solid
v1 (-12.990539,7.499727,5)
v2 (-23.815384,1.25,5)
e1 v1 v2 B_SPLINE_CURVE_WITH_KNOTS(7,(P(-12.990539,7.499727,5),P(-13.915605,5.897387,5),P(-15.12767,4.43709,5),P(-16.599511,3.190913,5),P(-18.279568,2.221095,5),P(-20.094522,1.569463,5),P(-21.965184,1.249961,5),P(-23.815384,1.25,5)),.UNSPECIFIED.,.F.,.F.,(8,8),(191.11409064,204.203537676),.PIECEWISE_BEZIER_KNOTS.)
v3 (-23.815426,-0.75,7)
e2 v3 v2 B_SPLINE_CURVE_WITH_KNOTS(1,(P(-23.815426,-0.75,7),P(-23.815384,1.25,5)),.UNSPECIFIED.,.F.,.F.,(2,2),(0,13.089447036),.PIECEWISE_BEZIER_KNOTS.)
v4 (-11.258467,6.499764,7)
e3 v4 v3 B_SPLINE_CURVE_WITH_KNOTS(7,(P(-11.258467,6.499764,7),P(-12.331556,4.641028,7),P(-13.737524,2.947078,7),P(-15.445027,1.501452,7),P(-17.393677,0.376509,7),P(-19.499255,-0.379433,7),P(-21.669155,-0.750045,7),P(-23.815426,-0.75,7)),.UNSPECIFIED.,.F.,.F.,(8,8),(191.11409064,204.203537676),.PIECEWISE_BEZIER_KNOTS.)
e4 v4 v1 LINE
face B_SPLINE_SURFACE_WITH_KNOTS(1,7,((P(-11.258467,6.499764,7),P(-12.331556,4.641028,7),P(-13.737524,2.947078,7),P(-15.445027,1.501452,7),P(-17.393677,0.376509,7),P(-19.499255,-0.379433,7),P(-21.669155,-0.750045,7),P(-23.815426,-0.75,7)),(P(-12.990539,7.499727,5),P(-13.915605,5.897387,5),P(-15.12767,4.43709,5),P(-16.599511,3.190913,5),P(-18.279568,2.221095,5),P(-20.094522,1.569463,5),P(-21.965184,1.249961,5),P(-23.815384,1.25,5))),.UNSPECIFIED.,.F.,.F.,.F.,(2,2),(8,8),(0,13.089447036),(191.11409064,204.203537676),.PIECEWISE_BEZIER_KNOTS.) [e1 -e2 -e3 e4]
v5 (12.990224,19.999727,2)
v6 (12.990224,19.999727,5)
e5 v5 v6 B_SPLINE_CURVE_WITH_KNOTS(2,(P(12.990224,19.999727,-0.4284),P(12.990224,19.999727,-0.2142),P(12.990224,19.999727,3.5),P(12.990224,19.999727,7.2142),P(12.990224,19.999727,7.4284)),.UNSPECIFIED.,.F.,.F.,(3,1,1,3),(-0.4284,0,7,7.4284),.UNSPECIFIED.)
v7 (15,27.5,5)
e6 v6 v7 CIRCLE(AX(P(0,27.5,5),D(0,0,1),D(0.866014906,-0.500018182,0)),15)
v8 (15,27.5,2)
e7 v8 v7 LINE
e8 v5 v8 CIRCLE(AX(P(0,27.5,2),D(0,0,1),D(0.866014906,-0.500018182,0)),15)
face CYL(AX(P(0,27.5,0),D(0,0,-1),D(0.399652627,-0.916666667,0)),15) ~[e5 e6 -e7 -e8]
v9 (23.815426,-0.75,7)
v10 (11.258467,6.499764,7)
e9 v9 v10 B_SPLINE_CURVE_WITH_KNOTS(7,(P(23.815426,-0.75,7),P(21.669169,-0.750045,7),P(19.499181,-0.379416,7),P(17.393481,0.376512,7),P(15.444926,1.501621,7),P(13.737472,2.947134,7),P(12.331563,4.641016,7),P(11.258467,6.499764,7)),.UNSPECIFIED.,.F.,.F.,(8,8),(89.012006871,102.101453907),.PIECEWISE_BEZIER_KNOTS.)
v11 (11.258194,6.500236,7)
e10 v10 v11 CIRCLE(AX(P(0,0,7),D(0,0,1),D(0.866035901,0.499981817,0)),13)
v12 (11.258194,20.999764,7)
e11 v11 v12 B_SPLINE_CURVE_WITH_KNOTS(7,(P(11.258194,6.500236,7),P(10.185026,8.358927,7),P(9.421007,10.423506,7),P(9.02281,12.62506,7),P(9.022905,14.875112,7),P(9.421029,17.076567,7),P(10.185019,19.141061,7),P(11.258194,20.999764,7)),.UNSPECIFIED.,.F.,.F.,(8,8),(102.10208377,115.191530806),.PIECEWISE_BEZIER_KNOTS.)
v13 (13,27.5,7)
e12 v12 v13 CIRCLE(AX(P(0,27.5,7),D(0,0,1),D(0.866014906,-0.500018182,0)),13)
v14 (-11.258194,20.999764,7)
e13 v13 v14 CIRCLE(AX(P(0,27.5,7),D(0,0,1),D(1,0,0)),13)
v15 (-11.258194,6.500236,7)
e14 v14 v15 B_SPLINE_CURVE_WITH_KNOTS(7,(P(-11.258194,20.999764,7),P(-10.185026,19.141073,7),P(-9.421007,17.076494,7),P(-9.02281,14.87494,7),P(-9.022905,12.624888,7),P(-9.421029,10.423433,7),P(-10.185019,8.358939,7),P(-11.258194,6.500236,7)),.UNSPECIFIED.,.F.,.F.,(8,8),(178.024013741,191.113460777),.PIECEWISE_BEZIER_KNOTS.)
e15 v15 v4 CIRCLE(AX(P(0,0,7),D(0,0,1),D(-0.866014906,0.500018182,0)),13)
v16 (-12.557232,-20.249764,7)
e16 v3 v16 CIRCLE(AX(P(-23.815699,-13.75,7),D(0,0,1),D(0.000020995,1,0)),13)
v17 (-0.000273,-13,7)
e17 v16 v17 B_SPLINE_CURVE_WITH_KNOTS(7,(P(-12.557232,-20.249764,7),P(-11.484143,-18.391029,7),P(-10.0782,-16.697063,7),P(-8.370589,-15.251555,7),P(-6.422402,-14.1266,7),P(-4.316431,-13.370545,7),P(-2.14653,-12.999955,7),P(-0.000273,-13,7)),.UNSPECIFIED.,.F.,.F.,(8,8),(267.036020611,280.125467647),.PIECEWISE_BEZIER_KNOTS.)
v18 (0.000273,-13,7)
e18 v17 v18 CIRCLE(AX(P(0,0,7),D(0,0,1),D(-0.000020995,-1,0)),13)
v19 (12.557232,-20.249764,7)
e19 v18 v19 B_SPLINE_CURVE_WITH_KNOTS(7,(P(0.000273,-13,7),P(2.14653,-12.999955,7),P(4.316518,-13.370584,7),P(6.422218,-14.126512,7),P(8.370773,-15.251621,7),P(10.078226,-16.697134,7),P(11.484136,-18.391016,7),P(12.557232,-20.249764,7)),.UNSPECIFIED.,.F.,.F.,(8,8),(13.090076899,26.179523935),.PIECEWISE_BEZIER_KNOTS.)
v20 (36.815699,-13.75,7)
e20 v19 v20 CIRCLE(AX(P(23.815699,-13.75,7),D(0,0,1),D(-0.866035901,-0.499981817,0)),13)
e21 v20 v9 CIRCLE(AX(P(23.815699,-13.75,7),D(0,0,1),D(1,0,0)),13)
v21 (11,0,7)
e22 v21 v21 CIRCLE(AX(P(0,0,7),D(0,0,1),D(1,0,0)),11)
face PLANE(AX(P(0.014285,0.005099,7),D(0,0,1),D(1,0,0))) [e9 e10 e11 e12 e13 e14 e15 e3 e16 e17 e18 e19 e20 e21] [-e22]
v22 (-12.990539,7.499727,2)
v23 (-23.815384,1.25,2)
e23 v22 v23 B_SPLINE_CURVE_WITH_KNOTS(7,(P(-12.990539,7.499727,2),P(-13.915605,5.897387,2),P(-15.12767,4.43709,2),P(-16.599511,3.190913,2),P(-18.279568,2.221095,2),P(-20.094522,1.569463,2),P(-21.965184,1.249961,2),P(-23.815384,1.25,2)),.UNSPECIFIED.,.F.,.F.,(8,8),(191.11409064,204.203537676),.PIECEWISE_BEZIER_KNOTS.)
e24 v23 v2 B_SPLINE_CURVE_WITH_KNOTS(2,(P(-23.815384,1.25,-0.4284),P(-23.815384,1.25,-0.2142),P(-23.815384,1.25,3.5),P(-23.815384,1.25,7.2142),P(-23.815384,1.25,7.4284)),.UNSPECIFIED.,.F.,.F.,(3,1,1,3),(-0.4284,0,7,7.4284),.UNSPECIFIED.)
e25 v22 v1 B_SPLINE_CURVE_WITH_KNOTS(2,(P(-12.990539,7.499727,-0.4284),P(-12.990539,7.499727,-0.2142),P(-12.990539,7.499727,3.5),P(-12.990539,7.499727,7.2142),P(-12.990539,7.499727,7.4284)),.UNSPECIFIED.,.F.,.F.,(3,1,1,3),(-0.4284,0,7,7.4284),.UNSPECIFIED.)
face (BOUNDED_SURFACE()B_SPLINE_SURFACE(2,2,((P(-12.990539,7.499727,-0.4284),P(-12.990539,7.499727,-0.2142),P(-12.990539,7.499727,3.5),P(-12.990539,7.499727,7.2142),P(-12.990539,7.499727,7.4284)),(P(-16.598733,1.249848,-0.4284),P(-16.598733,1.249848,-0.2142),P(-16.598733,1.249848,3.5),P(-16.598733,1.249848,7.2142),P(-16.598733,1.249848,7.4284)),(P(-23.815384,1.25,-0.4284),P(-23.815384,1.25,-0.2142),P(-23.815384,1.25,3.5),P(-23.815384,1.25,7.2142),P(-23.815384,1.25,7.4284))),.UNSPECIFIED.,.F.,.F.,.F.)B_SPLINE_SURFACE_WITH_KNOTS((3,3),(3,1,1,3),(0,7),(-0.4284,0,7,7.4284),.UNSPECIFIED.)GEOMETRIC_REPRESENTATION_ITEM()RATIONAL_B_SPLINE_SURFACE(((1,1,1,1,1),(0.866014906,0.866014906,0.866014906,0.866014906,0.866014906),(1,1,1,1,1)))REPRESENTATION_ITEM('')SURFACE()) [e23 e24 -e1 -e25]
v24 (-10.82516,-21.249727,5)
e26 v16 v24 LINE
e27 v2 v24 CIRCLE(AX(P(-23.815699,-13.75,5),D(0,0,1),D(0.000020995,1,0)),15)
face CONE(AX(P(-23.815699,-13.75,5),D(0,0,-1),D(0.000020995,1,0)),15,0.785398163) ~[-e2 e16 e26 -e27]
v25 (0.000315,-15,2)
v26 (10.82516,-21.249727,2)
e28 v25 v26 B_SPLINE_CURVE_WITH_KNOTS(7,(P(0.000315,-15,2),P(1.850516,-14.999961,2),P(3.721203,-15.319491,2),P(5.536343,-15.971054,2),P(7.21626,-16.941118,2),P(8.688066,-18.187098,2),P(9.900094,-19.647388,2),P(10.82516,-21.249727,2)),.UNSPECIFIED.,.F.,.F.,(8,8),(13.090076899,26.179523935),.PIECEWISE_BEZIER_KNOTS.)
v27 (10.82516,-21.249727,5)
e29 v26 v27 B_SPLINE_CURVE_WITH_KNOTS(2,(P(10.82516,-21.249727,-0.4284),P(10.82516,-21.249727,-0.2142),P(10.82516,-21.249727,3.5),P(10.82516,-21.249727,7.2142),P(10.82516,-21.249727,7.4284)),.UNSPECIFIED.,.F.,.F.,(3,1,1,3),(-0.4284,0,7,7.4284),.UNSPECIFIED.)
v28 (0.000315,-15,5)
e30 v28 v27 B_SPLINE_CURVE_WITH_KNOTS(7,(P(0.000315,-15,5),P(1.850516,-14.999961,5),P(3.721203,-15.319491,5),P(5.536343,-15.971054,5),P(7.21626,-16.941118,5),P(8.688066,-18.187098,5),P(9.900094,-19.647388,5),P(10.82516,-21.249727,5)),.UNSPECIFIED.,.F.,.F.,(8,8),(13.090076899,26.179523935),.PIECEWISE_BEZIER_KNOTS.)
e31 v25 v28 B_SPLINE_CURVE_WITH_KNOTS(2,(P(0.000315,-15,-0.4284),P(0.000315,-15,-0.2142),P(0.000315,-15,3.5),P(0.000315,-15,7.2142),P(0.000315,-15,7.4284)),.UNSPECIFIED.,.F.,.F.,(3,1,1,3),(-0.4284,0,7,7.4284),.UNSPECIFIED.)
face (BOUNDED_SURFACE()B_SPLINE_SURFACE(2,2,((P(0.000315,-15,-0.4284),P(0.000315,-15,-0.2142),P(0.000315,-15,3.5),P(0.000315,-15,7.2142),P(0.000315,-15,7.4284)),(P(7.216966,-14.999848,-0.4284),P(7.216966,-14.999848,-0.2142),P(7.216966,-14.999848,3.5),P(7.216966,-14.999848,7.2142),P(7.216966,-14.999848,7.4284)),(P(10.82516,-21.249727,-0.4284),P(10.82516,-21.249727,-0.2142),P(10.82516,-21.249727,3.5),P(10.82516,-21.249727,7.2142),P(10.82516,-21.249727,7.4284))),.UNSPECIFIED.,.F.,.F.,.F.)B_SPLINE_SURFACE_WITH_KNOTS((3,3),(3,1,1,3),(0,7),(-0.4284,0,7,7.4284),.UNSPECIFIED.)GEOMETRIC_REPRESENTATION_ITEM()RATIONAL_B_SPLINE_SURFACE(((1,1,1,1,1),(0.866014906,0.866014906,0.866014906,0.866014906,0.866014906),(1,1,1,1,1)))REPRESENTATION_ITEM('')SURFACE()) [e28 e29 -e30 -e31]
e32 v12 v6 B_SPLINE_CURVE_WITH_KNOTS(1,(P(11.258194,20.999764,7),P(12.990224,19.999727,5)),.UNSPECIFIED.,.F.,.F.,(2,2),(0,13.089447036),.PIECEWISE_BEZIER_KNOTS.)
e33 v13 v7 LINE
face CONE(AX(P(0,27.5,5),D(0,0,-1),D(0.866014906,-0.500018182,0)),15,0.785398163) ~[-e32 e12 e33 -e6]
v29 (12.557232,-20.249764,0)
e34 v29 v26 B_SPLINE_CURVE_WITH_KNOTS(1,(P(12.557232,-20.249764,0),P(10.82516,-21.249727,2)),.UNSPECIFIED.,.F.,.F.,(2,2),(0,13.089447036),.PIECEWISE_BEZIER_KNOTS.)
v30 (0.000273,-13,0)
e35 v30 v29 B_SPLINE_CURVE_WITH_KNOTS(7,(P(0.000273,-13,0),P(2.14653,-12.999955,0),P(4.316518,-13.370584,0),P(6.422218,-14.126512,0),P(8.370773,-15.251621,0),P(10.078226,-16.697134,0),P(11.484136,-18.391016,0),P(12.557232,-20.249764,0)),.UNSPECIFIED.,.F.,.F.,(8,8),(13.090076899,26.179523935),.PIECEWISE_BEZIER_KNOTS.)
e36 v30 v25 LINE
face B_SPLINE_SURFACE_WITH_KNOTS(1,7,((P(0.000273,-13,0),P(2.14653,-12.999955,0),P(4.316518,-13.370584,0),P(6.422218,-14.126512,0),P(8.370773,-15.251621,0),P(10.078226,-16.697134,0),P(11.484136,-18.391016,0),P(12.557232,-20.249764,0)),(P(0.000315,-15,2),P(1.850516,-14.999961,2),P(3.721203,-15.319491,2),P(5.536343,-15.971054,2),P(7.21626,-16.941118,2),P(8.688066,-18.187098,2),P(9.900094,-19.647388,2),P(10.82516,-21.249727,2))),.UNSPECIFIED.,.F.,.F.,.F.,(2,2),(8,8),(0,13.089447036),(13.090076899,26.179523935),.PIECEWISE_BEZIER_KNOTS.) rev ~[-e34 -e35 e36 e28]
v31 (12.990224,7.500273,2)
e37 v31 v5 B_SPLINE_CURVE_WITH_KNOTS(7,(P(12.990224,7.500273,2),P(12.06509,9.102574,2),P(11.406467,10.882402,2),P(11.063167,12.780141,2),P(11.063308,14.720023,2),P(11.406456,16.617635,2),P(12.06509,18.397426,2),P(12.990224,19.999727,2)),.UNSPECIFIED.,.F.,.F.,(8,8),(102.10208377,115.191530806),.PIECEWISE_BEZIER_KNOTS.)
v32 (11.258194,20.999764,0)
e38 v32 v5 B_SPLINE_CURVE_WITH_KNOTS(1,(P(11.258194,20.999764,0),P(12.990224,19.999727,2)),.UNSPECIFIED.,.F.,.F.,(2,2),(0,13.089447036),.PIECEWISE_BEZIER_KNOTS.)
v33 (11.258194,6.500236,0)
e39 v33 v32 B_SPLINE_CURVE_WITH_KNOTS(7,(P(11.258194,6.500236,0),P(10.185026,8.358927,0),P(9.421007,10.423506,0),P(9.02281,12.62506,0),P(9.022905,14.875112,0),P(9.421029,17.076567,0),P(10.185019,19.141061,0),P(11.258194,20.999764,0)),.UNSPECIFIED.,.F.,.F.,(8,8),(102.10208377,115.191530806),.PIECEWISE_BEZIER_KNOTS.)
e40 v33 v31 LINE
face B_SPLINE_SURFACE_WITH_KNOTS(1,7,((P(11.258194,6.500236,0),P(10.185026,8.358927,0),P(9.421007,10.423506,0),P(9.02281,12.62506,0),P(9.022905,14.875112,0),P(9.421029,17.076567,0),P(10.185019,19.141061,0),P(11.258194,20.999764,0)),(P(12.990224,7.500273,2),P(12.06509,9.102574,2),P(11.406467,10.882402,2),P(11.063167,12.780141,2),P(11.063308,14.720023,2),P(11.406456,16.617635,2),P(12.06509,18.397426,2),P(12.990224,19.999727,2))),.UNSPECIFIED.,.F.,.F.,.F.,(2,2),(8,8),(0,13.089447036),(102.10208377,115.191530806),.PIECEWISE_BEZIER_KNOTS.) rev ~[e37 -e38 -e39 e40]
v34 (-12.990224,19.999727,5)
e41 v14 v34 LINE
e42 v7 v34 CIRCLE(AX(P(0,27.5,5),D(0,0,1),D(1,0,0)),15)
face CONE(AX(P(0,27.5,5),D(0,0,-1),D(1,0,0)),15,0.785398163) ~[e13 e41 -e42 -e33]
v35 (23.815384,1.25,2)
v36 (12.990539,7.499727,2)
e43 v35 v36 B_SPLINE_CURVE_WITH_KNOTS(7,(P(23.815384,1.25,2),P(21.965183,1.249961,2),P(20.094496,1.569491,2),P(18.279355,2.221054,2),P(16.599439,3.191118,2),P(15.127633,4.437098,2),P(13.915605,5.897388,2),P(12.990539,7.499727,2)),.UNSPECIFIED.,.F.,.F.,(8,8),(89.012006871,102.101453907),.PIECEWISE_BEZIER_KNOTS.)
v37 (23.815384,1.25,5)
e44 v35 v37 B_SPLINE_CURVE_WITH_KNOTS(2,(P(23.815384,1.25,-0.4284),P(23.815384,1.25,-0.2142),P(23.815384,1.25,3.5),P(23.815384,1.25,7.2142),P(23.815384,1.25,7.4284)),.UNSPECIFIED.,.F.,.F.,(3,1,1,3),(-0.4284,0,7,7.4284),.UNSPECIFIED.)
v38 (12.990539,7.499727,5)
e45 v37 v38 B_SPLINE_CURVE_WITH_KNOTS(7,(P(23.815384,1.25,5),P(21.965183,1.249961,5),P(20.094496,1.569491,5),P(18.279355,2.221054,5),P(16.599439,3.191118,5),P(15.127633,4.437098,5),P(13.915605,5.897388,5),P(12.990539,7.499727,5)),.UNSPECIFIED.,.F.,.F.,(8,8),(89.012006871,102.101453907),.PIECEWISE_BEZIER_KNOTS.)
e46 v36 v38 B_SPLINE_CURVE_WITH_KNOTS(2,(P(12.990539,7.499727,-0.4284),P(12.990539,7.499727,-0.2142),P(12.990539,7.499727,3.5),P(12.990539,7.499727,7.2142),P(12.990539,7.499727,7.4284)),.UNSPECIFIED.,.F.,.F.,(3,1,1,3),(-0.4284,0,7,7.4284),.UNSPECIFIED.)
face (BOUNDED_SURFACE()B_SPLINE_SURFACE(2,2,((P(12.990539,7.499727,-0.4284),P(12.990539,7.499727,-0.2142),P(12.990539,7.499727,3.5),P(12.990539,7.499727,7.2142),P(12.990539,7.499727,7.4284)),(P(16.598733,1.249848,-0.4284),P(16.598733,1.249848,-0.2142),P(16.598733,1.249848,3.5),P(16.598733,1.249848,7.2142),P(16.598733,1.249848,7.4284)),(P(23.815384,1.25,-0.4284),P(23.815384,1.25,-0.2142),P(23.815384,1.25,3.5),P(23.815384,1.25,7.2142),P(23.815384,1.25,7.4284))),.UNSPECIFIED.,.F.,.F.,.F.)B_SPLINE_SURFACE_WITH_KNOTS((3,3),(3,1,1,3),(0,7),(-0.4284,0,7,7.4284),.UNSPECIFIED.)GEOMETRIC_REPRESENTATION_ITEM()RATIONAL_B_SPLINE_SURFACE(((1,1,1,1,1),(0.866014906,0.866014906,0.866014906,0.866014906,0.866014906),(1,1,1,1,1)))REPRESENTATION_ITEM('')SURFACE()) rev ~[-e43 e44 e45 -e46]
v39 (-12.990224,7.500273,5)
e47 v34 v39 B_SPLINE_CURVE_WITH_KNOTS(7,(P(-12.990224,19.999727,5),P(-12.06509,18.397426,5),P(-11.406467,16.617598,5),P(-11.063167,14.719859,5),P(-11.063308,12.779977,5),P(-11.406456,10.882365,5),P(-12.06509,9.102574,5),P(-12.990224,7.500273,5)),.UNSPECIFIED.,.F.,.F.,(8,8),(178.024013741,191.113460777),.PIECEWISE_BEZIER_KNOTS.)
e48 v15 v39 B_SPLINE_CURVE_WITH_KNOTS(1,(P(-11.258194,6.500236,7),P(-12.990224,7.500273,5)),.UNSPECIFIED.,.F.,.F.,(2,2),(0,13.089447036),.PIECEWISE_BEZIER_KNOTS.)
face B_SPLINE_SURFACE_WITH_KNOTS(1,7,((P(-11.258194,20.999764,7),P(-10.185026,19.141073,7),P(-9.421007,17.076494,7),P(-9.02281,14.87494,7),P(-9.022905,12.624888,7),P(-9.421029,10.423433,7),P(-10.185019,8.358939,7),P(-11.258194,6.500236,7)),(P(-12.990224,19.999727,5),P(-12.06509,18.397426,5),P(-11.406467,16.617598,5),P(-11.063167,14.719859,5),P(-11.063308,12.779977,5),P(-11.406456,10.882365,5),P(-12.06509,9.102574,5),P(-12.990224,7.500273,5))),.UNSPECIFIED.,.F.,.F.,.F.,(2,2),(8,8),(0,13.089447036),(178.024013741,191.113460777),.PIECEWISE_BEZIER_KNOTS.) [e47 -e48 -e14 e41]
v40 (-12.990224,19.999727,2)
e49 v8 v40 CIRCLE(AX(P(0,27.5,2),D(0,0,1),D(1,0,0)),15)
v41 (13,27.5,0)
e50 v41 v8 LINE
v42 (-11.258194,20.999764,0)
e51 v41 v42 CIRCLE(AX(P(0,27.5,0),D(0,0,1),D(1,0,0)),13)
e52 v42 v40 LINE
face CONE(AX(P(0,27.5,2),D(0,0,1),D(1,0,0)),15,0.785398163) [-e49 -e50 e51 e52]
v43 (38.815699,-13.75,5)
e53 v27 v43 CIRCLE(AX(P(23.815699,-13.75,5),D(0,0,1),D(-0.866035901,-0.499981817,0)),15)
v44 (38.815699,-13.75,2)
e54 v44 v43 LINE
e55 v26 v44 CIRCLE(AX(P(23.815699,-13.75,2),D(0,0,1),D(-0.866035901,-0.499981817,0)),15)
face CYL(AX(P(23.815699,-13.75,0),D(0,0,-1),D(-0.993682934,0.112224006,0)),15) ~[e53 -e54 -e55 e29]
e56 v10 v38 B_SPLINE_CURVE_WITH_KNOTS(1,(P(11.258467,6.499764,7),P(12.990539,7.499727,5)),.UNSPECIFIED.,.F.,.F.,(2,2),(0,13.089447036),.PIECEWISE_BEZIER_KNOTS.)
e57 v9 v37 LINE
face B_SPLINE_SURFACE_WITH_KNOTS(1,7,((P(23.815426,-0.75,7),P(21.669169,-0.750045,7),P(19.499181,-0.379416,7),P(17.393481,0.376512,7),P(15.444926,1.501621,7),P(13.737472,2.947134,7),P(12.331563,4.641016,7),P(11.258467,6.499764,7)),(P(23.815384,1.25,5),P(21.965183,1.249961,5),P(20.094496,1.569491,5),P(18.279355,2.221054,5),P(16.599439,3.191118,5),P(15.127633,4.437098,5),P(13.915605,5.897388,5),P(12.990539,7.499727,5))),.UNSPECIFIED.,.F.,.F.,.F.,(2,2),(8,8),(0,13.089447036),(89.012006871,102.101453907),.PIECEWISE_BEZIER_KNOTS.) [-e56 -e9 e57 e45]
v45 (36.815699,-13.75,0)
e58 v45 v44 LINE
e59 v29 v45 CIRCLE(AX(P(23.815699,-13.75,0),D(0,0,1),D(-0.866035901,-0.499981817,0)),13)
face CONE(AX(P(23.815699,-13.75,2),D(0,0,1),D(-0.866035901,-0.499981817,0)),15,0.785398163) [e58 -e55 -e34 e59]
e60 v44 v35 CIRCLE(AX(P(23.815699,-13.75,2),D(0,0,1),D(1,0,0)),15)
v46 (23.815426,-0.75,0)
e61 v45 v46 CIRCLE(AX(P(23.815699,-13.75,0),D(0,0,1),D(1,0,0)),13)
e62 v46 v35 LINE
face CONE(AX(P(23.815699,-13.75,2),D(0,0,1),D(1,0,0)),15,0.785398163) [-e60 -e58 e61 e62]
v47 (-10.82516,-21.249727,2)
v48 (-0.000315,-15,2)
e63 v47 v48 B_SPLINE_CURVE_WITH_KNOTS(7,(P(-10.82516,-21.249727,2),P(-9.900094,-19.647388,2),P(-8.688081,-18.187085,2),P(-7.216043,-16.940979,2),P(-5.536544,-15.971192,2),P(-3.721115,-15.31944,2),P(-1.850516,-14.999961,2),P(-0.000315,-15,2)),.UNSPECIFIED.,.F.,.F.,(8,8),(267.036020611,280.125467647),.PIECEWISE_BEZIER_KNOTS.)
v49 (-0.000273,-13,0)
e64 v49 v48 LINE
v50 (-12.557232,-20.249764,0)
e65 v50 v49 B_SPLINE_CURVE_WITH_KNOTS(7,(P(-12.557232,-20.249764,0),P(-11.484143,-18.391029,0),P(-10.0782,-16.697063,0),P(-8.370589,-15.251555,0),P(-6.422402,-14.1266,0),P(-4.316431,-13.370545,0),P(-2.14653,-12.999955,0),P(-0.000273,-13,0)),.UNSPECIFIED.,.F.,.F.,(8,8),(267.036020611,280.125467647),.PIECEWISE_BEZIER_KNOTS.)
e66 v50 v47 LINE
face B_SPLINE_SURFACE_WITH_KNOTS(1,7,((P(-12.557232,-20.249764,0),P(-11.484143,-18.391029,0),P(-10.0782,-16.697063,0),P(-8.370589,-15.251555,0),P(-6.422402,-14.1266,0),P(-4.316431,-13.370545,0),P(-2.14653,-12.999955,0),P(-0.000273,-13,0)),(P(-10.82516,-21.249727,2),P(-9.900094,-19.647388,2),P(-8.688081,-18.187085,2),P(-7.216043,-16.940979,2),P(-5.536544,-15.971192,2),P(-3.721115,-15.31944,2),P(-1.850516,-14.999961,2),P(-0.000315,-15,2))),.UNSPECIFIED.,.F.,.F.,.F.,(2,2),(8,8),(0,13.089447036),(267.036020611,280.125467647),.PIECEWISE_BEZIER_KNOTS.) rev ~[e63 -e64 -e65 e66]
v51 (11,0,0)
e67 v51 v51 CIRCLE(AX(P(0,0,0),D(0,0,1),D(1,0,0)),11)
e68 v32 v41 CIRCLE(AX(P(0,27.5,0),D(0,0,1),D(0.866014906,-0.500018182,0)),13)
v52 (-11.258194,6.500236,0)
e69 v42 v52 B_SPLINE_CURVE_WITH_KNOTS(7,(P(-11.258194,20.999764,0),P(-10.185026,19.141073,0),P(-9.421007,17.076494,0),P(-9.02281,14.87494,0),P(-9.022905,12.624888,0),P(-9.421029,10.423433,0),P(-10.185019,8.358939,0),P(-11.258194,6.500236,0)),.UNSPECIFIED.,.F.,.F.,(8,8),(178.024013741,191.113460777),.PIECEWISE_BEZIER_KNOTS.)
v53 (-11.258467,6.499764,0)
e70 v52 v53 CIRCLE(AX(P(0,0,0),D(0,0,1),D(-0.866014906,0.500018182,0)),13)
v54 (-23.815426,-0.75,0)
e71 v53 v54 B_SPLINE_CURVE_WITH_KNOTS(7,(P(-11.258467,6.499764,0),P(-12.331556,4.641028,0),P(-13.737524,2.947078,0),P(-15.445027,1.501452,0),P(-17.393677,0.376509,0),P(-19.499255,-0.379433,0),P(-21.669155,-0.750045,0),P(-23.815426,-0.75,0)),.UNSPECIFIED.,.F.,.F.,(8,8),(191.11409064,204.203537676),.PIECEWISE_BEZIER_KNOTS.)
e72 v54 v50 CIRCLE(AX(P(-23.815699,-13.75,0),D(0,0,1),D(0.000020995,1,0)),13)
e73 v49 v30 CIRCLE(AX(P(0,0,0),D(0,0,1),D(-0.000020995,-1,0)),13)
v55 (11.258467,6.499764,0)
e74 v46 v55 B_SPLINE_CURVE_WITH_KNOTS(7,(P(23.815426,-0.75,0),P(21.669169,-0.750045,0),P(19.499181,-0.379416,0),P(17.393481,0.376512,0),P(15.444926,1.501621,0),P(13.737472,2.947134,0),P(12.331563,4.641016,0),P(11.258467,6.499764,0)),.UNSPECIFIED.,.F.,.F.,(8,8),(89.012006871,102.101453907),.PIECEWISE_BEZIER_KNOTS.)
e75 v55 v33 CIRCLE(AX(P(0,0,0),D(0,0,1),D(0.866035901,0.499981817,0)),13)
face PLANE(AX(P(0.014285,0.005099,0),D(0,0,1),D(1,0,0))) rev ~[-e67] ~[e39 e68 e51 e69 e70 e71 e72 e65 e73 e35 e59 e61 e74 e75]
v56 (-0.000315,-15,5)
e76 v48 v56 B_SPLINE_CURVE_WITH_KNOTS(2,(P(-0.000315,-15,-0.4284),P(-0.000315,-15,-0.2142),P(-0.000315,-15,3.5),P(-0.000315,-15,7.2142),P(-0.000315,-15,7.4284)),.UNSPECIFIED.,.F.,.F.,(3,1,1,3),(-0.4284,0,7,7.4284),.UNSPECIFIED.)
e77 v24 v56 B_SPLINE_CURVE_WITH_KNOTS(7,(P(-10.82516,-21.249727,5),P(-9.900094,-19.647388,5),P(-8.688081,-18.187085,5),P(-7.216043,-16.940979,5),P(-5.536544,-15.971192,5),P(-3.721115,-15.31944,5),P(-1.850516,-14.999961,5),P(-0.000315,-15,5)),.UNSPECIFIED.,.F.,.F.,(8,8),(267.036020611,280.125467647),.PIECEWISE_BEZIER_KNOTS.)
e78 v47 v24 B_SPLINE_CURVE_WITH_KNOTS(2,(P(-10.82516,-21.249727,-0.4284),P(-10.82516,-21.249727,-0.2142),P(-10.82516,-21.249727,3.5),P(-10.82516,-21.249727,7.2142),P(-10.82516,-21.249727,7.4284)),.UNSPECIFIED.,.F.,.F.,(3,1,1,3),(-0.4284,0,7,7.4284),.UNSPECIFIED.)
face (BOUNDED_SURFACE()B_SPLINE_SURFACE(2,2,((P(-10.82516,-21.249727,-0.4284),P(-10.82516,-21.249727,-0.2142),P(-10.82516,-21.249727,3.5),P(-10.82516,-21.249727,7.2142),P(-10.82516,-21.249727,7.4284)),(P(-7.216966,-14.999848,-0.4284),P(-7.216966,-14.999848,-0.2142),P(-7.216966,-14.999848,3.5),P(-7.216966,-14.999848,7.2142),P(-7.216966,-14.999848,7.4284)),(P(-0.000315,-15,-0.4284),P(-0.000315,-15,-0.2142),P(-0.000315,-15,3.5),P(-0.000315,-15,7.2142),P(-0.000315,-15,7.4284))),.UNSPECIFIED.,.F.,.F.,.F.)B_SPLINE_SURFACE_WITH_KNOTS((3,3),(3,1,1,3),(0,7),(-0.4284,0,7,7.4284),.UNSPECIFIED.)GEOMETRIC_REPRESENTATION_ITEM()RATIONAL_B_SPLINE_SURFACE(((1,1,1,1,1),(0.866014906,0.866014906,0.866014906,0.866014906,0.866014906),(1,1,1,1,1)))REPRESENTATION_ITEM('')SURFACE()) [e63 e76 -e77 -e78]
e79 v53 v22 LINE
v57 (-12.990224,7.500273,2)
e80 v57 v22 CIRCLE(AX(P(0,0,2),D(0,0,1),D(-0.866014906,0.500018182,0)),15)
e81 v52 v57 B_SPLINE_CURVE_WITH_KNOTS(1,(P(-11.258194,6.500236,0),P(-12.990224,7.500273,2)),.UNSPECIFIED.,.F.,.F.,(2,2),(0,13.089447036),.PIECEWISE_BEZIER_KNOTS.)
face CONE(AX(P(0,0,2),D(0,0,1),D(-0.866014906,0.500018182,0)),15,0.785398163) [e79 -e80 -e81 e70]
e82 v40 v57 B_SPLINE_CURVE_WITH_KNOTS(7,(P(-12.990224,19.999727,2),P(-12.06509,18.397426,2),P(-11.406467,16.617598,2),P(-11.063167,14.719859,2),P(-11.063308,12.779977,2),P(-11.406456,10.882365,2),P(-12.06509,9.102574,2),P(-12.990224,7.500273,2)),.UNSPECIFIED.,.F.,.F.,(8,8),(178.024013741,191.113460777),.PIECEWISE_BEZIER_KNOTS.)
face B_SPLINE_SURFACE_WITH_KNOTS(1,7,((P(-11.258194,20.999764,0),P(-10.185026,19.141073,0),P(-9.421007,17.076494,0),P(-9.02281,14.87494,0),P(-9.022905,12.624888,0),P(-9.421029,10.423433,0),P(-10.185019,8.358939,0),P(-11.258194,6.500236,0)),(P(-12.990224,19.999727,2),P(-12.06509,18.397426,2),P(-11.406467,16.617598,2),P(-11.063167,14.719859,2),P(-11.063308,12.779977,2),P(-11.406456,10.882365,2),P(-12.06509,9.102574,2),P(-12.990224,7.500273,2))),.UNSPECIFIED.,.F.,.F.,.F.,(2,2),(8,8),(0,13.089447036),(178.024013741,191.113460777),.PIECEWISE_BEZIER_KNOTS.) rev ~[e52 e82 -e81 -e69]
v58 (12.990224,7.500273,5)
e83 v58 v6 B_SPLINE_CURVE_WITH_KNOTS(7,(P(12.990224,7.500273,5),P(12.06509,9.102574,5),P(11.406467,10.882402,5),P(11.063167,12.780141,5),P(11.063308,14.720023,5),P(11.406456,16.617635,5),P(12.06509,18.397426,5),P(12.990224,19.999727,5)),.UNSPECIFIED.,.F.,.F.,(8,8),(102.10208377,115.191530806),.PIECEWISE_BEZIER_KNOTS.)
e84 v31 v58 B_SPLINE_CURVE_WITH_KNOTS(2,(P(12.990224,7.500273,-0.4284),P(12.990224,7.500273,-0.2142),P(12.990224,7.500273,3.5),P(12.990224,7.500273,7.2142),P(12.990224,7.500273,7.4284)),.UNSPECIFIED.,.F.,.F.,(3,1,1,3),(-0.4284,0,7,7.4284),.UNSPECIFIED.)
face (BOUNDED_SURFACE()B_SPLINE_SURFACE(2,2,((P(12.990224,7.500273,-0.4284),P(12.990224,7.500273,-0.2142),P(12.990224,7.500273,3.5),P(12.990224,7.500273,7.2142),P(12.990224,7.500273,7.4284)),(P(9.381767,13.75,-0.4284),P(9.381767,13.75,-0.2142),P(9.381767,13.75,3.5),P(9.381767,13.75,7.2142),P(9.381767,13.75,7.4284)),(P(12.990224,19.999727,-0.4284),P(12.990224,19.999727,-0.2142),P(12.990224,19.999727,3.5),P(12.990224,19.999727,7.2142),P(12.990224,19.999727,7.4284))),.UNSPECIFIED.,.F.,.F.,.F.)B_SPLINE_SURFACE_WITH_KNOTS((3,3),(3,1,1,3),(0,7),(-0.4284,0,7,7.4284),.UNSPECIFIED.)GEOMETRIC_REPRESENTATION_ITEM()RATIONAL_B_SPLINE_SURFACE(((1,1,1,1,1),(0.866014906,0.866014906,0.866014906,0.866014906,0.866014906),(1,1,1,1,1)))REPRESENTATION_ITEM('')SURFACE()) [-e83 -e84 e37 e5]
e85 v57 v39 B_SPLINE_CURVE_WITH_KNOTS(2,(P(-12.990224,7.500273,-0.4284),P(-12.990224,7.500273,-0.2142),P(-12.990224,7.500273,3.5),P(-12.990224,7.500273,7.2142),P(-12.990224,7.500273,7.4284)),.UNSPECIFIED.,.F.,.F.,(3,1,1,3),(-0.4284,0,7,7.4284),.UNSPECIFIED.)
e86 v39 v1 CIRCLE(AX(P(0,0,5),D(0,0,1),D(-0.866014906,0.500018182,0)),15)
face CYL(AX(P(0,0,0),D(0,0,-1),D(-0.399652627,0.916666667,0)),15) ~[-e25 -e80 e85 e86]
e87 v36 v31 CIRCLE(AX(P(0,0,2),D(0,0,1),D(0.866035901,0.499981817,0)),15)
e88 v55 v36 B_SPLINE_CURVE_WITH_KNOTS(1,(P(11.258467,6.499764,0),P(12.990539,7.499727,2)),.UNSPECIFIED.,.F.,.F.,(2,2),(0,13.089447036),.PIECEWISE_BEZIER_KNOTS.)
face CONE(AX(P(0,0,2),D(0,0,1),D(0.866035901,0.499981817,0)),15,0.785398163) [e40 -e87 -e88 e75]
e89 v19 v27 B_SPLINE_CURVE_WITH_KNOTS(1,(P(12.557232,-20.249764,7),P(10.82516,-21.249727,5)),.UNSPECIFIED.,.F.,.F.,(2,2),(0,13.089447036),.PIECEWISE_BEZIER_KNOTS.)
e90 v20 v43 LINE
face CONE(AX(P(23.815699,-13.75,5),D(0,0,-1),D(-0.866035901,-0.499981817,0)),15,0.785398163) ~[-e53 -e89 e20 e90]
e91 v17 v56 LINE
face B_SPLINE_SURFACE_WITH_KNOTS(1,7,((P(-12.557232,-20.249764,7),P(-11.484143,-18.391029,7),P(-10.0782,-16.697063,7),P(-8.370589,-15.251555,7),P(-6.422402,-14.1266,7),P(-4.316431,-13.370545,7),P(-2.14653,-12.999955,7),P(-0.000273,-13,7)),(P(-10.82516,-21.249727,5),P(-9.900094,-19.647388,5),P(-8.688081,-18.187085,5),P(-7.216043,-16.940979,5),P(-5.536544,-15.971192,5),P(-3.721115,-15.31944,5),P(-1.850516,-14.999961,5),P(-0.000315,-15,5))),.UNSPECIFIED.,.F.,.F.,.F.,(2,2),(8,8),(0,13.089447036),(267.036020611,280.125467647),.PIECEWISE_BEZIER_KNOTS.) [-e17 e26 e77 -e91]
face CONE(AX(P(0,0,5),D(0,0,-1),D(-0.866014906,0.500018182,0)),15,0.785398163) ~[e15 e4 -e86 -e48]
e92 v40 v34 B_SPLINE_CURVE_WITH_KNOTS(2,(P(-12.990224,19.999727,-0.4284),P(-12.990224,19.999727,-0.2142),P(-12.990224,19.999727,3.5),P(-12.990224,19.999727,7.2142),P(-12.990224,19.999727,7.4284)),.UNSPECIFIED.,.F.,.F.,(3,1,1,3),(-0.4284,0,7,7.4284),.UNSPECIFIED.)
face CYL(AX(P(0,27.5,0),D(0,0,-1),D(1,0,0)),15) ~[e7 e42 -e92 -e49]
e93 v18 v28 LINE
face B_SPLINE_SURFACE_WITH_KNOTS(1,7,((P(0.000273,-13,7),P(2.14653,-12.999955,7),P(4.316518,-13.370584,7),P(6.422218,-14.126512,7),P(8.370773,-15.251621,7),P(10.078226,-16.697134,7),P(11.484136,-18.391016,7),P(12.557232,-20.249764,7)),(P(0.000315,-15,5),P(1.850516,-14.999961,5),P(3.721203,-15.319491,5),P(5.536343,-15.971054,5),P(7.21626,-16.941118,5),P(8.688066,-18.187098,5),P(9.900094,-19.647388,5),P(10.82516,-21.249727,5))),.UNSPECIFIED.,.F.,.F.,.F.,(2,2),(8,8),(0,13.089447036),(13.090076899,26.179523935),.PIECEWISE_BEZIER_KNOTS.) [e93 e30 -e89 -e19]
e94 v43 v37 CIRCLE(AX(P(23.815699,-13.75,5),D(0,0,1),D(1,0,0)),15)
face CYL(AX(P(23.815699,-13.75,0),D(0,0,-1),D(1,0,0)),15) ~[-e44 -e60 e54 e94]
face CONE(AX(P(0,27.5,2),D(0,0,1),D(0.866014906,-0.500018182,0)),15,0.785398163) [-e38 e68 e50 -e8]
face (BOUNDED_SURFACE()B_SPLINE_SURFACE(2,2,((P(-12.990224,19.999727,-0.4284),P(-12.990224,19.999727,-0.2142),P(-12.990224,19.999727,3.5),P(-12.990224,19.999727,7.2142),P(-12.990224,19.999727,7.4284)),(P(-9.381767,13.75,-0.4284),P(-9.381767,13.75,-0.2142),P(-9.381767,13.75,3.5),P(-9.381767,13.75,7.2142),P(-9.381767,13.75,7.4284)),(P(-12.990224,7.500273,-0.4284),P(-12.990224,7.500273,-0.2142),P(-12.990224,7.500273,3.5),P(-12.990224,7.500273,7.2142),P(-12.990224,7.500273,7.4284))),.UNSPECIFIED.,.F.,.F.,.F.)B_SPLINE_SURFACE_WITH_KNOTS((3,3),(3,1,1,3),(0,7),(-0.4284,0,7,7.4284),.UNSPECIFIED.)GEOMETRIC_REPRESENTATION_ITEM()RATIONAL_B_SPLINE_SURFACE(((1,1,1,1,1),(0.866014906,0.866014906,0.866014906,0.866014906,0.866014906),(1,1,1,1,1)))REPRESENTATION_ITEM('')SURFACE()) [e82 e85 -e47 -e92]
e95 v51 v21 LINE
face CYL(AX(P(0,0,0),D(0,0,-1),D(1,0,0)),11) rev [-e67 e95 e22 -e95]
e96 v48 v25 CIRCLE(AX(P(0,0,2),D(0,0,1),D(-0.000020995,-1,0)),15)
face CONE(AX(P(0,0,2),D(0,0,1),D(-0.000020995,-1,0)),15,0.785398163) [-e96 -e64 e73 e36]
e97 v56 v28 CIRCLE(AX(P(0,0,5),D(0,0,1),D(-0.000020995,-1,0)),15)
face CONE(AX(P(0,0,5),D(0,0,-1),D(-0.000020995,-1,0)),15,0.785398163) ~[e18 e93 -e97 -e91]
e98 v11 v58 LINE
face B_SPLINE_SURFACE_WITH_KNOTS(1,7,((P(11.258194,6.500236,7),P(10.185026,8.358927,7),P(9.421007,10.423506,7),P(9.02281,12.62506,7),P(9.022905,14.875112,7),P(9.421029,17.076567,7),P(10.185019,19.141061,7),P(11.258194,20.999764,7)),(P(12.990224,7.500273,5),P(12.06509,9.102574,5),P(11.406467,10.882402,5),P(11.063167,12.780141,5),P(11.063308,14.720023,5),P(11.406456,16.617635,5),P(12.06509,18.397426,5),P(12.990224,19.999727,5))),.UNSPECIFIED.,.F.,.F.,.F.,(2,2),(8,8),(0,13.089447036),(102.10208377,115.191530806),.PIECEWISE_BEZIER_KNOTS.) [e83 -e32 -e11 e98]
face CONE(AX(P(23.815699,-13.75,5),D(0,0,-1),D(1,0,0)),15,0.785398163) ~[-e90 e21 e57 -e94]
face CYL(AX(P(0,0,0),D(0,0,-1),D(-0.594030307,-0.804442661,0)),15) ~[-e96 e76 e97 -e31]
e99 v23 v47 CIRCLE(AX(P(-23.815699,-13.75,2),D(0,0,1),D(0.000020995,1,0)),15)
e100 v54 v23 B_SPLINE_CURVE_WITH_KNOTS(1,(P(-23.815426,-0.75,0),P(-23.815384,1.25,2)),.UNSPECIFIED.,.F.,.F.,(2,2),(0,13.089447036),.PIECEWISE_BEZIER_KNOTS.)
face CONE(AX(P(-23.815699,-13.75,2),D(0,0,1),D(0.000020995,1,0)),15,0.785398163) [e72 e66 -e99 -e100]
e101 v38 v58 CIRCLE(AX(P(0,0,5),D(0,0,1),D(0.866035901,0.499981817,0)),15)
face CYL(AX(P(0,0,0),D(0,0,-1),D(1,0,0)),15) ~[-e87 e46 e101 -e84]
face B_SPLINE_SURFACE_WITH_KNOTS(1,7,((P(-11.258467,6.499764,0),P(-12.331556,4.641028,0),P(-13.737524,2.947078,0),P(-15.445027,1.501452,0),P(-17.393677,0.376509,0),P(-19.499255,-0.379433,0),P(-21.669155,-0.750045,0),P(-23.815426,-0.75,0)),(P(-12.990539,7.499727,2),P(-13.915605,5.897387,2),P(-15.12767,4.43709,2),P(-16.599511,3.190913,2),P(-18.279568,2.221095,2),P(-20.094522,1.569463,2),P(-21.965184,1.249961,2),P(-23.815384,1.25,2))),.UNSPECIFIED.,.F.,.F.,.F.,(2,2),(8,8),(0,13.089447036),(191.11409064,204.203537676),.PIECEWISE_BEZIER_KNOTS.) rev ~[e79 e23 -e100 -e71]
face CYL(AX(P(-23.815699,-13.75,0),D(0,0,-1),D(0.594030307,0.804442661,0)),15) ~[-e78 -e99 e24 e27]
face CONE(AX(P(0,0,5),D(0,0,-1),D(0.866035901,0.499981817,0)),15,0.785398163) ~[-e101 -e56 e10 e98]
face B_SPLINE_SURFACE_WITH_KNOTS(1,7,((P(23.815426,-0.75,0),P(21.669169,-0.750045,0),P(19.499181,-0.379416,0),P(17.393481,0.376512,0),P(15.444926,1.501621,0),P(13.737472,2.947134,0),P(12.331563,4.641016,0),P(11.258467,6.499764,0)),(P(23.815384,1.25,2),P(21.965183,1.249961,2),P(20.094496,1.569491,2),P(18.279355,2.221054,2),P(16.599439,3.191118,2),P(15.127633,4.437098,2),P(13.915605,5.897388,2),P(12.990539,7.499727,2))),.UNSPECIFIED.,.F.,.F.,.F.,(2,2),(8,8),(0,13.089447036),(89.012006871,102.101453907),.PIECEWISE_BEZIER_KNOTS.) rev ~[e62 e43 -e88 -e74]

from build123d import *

# Parameters (mm, degrees)
F0_R     = 11
F1_DEPTH = 7
F2_R     = 12.499
F3_SIZE  = 2


# Not quite as in the source:
# - a fillet or chamfer is up to 0.001 mm smaller than in the source, because OpenCascade refuses the exact size


with BuildPart() as f1:
    # F0 (on Top) → F1 (new body)
    with BuildSketch(Plane.XY):
        with BuildLine():
            ThreePointArc((14.9052440041, -1.6833600857), (14.9762922658, -0.8430124372), (15, 0))
            ThreePointArc((15, 0), (12.5483433381, 8.2182163192), (5.9947894041, 13.75))
            ThreePointArc((5.9947894041, 13.75), (0, 12.5), (-5.9947894041, 13.75))
            ThreePointArc((-5.9947894041, 13.75), (-12.9903810568, 7.5), (-14.9052440041, -1.6833600857))
            ThreePointArc((-14.9052440041, -1.6833600857), (-10.8253175473, -6.25), (-8.9104546, -12.0666399143))
            ThreePointArc((-8.9104546, -12.0666399143), (0, -15), (8.9104546, -12.0666399143))
            ThreePointArc((8.9104546, -12.0666399143), (10.8253175473, -6.25), (14.9052440041, -1.6833600857))
        make_face()
        Circle(F0_R, mode=Mode.SUBTRACT)
        with BuildLine():
            ThreePointArc((-5.9947894041, 13.75), (0, 12.5), (5.9947894041, 13.75))
            ThreePointArc((5.9947894041, 13.75), (0, 15), (-5.9947894041, 13.75))
        make_face()
        with BuildLine():
            ThreePointArc((-5.9947894041, 13.75), (0, 15), (5.9947894041, 13.75))
            ThreePointArc((5.9947894041, 13.75), (12.5483433381, 19.2817836808), (15, 27.5))
            ThreePointArc((15, 27.5), (-8.2182163192, 40.0483433381), (-5.9947894041, 13.75))
        make_face()
        with BuildLine():
            ThreePointArc((38.8156986041, -13.75), (30.5737745507, -0.3586442247), (14.9052440041, -1.6833600857))
            ThreePointArc((14.9052440041, -1.6833600857), (12.9903810568, -7.5), (8.9104546, -12.0666399143))
            ThreePointArc((8.9104546, -12.0666399143), (22.9726861669, -28.7262922658), (38.8156986041, -13.75))
        make_face()
        with BuildLine():
            ThreePointArc((8.9104546, -12.0666399143), (12.9903810568, -7.5), (14.9052440041, -1.6833600857))
            ThreePointArc((14.9052440041, -1.6833600857), (10.8253175473, -6.25), (8.9104546, -12.0666399143))
        make_face()
        with BuildLine():
            ThreePointArc((-8.9104546, -12.0666399143), (-10.8253175473, -6.25), (-14.9052440041, -1.6833600857))
            ThreePointArc((-14.9052440041, -1.6833600857), (-12.9903810568, -7.5), (-8.9104546, -12.0666399143))
        make_face()
        with BuildLine():
            ThreePointArc((-8.9104546, -12.0666399143), (-12.9903810568, -7.5), (-14.9052440041, -1.6833600857))
            ThreePointArc((-14.9052440041, -1.6833600857), (-37.2070543793, -20.5080759466), (-8.8156986041, -13.75))
            ThreePointArc((-8.8156986041, -13.75), (-8.8394063383, -12.9069875628), (-8.9104546, -12.0666399143))
        make_face()
    extrude(amount=F1_DEPTH)

    # F2 (radius 12.5 in the source; OpenCascade refuses exactly that, so slightly less here)
    f2_edges = [f1.edges().sort_by_distance(p)[0] for p in [
        (-5.994789, 13.75, 3.5),
        (14.905244, -1.68336, 3.5),
        (-14.905244, -1.68336, 3.5),
        (5.994789, 13.75, 3.5),
        (-8.910455, -12.06664, 3.5),
        (8.910455, -12.06664, 3.5),
    ]]
    fillet(f2_edges, radius=F2_R)

    # F3
    f3_edges = [f1.edges().sort_by_distance(p)[0] for p in [
        (-6.250077, -16.674548, 0),
        (-6.250077, -16.674548, 7),
    ]]
    chamfer(f3_edges, length=F3_SIZE)


solid = f1.part
